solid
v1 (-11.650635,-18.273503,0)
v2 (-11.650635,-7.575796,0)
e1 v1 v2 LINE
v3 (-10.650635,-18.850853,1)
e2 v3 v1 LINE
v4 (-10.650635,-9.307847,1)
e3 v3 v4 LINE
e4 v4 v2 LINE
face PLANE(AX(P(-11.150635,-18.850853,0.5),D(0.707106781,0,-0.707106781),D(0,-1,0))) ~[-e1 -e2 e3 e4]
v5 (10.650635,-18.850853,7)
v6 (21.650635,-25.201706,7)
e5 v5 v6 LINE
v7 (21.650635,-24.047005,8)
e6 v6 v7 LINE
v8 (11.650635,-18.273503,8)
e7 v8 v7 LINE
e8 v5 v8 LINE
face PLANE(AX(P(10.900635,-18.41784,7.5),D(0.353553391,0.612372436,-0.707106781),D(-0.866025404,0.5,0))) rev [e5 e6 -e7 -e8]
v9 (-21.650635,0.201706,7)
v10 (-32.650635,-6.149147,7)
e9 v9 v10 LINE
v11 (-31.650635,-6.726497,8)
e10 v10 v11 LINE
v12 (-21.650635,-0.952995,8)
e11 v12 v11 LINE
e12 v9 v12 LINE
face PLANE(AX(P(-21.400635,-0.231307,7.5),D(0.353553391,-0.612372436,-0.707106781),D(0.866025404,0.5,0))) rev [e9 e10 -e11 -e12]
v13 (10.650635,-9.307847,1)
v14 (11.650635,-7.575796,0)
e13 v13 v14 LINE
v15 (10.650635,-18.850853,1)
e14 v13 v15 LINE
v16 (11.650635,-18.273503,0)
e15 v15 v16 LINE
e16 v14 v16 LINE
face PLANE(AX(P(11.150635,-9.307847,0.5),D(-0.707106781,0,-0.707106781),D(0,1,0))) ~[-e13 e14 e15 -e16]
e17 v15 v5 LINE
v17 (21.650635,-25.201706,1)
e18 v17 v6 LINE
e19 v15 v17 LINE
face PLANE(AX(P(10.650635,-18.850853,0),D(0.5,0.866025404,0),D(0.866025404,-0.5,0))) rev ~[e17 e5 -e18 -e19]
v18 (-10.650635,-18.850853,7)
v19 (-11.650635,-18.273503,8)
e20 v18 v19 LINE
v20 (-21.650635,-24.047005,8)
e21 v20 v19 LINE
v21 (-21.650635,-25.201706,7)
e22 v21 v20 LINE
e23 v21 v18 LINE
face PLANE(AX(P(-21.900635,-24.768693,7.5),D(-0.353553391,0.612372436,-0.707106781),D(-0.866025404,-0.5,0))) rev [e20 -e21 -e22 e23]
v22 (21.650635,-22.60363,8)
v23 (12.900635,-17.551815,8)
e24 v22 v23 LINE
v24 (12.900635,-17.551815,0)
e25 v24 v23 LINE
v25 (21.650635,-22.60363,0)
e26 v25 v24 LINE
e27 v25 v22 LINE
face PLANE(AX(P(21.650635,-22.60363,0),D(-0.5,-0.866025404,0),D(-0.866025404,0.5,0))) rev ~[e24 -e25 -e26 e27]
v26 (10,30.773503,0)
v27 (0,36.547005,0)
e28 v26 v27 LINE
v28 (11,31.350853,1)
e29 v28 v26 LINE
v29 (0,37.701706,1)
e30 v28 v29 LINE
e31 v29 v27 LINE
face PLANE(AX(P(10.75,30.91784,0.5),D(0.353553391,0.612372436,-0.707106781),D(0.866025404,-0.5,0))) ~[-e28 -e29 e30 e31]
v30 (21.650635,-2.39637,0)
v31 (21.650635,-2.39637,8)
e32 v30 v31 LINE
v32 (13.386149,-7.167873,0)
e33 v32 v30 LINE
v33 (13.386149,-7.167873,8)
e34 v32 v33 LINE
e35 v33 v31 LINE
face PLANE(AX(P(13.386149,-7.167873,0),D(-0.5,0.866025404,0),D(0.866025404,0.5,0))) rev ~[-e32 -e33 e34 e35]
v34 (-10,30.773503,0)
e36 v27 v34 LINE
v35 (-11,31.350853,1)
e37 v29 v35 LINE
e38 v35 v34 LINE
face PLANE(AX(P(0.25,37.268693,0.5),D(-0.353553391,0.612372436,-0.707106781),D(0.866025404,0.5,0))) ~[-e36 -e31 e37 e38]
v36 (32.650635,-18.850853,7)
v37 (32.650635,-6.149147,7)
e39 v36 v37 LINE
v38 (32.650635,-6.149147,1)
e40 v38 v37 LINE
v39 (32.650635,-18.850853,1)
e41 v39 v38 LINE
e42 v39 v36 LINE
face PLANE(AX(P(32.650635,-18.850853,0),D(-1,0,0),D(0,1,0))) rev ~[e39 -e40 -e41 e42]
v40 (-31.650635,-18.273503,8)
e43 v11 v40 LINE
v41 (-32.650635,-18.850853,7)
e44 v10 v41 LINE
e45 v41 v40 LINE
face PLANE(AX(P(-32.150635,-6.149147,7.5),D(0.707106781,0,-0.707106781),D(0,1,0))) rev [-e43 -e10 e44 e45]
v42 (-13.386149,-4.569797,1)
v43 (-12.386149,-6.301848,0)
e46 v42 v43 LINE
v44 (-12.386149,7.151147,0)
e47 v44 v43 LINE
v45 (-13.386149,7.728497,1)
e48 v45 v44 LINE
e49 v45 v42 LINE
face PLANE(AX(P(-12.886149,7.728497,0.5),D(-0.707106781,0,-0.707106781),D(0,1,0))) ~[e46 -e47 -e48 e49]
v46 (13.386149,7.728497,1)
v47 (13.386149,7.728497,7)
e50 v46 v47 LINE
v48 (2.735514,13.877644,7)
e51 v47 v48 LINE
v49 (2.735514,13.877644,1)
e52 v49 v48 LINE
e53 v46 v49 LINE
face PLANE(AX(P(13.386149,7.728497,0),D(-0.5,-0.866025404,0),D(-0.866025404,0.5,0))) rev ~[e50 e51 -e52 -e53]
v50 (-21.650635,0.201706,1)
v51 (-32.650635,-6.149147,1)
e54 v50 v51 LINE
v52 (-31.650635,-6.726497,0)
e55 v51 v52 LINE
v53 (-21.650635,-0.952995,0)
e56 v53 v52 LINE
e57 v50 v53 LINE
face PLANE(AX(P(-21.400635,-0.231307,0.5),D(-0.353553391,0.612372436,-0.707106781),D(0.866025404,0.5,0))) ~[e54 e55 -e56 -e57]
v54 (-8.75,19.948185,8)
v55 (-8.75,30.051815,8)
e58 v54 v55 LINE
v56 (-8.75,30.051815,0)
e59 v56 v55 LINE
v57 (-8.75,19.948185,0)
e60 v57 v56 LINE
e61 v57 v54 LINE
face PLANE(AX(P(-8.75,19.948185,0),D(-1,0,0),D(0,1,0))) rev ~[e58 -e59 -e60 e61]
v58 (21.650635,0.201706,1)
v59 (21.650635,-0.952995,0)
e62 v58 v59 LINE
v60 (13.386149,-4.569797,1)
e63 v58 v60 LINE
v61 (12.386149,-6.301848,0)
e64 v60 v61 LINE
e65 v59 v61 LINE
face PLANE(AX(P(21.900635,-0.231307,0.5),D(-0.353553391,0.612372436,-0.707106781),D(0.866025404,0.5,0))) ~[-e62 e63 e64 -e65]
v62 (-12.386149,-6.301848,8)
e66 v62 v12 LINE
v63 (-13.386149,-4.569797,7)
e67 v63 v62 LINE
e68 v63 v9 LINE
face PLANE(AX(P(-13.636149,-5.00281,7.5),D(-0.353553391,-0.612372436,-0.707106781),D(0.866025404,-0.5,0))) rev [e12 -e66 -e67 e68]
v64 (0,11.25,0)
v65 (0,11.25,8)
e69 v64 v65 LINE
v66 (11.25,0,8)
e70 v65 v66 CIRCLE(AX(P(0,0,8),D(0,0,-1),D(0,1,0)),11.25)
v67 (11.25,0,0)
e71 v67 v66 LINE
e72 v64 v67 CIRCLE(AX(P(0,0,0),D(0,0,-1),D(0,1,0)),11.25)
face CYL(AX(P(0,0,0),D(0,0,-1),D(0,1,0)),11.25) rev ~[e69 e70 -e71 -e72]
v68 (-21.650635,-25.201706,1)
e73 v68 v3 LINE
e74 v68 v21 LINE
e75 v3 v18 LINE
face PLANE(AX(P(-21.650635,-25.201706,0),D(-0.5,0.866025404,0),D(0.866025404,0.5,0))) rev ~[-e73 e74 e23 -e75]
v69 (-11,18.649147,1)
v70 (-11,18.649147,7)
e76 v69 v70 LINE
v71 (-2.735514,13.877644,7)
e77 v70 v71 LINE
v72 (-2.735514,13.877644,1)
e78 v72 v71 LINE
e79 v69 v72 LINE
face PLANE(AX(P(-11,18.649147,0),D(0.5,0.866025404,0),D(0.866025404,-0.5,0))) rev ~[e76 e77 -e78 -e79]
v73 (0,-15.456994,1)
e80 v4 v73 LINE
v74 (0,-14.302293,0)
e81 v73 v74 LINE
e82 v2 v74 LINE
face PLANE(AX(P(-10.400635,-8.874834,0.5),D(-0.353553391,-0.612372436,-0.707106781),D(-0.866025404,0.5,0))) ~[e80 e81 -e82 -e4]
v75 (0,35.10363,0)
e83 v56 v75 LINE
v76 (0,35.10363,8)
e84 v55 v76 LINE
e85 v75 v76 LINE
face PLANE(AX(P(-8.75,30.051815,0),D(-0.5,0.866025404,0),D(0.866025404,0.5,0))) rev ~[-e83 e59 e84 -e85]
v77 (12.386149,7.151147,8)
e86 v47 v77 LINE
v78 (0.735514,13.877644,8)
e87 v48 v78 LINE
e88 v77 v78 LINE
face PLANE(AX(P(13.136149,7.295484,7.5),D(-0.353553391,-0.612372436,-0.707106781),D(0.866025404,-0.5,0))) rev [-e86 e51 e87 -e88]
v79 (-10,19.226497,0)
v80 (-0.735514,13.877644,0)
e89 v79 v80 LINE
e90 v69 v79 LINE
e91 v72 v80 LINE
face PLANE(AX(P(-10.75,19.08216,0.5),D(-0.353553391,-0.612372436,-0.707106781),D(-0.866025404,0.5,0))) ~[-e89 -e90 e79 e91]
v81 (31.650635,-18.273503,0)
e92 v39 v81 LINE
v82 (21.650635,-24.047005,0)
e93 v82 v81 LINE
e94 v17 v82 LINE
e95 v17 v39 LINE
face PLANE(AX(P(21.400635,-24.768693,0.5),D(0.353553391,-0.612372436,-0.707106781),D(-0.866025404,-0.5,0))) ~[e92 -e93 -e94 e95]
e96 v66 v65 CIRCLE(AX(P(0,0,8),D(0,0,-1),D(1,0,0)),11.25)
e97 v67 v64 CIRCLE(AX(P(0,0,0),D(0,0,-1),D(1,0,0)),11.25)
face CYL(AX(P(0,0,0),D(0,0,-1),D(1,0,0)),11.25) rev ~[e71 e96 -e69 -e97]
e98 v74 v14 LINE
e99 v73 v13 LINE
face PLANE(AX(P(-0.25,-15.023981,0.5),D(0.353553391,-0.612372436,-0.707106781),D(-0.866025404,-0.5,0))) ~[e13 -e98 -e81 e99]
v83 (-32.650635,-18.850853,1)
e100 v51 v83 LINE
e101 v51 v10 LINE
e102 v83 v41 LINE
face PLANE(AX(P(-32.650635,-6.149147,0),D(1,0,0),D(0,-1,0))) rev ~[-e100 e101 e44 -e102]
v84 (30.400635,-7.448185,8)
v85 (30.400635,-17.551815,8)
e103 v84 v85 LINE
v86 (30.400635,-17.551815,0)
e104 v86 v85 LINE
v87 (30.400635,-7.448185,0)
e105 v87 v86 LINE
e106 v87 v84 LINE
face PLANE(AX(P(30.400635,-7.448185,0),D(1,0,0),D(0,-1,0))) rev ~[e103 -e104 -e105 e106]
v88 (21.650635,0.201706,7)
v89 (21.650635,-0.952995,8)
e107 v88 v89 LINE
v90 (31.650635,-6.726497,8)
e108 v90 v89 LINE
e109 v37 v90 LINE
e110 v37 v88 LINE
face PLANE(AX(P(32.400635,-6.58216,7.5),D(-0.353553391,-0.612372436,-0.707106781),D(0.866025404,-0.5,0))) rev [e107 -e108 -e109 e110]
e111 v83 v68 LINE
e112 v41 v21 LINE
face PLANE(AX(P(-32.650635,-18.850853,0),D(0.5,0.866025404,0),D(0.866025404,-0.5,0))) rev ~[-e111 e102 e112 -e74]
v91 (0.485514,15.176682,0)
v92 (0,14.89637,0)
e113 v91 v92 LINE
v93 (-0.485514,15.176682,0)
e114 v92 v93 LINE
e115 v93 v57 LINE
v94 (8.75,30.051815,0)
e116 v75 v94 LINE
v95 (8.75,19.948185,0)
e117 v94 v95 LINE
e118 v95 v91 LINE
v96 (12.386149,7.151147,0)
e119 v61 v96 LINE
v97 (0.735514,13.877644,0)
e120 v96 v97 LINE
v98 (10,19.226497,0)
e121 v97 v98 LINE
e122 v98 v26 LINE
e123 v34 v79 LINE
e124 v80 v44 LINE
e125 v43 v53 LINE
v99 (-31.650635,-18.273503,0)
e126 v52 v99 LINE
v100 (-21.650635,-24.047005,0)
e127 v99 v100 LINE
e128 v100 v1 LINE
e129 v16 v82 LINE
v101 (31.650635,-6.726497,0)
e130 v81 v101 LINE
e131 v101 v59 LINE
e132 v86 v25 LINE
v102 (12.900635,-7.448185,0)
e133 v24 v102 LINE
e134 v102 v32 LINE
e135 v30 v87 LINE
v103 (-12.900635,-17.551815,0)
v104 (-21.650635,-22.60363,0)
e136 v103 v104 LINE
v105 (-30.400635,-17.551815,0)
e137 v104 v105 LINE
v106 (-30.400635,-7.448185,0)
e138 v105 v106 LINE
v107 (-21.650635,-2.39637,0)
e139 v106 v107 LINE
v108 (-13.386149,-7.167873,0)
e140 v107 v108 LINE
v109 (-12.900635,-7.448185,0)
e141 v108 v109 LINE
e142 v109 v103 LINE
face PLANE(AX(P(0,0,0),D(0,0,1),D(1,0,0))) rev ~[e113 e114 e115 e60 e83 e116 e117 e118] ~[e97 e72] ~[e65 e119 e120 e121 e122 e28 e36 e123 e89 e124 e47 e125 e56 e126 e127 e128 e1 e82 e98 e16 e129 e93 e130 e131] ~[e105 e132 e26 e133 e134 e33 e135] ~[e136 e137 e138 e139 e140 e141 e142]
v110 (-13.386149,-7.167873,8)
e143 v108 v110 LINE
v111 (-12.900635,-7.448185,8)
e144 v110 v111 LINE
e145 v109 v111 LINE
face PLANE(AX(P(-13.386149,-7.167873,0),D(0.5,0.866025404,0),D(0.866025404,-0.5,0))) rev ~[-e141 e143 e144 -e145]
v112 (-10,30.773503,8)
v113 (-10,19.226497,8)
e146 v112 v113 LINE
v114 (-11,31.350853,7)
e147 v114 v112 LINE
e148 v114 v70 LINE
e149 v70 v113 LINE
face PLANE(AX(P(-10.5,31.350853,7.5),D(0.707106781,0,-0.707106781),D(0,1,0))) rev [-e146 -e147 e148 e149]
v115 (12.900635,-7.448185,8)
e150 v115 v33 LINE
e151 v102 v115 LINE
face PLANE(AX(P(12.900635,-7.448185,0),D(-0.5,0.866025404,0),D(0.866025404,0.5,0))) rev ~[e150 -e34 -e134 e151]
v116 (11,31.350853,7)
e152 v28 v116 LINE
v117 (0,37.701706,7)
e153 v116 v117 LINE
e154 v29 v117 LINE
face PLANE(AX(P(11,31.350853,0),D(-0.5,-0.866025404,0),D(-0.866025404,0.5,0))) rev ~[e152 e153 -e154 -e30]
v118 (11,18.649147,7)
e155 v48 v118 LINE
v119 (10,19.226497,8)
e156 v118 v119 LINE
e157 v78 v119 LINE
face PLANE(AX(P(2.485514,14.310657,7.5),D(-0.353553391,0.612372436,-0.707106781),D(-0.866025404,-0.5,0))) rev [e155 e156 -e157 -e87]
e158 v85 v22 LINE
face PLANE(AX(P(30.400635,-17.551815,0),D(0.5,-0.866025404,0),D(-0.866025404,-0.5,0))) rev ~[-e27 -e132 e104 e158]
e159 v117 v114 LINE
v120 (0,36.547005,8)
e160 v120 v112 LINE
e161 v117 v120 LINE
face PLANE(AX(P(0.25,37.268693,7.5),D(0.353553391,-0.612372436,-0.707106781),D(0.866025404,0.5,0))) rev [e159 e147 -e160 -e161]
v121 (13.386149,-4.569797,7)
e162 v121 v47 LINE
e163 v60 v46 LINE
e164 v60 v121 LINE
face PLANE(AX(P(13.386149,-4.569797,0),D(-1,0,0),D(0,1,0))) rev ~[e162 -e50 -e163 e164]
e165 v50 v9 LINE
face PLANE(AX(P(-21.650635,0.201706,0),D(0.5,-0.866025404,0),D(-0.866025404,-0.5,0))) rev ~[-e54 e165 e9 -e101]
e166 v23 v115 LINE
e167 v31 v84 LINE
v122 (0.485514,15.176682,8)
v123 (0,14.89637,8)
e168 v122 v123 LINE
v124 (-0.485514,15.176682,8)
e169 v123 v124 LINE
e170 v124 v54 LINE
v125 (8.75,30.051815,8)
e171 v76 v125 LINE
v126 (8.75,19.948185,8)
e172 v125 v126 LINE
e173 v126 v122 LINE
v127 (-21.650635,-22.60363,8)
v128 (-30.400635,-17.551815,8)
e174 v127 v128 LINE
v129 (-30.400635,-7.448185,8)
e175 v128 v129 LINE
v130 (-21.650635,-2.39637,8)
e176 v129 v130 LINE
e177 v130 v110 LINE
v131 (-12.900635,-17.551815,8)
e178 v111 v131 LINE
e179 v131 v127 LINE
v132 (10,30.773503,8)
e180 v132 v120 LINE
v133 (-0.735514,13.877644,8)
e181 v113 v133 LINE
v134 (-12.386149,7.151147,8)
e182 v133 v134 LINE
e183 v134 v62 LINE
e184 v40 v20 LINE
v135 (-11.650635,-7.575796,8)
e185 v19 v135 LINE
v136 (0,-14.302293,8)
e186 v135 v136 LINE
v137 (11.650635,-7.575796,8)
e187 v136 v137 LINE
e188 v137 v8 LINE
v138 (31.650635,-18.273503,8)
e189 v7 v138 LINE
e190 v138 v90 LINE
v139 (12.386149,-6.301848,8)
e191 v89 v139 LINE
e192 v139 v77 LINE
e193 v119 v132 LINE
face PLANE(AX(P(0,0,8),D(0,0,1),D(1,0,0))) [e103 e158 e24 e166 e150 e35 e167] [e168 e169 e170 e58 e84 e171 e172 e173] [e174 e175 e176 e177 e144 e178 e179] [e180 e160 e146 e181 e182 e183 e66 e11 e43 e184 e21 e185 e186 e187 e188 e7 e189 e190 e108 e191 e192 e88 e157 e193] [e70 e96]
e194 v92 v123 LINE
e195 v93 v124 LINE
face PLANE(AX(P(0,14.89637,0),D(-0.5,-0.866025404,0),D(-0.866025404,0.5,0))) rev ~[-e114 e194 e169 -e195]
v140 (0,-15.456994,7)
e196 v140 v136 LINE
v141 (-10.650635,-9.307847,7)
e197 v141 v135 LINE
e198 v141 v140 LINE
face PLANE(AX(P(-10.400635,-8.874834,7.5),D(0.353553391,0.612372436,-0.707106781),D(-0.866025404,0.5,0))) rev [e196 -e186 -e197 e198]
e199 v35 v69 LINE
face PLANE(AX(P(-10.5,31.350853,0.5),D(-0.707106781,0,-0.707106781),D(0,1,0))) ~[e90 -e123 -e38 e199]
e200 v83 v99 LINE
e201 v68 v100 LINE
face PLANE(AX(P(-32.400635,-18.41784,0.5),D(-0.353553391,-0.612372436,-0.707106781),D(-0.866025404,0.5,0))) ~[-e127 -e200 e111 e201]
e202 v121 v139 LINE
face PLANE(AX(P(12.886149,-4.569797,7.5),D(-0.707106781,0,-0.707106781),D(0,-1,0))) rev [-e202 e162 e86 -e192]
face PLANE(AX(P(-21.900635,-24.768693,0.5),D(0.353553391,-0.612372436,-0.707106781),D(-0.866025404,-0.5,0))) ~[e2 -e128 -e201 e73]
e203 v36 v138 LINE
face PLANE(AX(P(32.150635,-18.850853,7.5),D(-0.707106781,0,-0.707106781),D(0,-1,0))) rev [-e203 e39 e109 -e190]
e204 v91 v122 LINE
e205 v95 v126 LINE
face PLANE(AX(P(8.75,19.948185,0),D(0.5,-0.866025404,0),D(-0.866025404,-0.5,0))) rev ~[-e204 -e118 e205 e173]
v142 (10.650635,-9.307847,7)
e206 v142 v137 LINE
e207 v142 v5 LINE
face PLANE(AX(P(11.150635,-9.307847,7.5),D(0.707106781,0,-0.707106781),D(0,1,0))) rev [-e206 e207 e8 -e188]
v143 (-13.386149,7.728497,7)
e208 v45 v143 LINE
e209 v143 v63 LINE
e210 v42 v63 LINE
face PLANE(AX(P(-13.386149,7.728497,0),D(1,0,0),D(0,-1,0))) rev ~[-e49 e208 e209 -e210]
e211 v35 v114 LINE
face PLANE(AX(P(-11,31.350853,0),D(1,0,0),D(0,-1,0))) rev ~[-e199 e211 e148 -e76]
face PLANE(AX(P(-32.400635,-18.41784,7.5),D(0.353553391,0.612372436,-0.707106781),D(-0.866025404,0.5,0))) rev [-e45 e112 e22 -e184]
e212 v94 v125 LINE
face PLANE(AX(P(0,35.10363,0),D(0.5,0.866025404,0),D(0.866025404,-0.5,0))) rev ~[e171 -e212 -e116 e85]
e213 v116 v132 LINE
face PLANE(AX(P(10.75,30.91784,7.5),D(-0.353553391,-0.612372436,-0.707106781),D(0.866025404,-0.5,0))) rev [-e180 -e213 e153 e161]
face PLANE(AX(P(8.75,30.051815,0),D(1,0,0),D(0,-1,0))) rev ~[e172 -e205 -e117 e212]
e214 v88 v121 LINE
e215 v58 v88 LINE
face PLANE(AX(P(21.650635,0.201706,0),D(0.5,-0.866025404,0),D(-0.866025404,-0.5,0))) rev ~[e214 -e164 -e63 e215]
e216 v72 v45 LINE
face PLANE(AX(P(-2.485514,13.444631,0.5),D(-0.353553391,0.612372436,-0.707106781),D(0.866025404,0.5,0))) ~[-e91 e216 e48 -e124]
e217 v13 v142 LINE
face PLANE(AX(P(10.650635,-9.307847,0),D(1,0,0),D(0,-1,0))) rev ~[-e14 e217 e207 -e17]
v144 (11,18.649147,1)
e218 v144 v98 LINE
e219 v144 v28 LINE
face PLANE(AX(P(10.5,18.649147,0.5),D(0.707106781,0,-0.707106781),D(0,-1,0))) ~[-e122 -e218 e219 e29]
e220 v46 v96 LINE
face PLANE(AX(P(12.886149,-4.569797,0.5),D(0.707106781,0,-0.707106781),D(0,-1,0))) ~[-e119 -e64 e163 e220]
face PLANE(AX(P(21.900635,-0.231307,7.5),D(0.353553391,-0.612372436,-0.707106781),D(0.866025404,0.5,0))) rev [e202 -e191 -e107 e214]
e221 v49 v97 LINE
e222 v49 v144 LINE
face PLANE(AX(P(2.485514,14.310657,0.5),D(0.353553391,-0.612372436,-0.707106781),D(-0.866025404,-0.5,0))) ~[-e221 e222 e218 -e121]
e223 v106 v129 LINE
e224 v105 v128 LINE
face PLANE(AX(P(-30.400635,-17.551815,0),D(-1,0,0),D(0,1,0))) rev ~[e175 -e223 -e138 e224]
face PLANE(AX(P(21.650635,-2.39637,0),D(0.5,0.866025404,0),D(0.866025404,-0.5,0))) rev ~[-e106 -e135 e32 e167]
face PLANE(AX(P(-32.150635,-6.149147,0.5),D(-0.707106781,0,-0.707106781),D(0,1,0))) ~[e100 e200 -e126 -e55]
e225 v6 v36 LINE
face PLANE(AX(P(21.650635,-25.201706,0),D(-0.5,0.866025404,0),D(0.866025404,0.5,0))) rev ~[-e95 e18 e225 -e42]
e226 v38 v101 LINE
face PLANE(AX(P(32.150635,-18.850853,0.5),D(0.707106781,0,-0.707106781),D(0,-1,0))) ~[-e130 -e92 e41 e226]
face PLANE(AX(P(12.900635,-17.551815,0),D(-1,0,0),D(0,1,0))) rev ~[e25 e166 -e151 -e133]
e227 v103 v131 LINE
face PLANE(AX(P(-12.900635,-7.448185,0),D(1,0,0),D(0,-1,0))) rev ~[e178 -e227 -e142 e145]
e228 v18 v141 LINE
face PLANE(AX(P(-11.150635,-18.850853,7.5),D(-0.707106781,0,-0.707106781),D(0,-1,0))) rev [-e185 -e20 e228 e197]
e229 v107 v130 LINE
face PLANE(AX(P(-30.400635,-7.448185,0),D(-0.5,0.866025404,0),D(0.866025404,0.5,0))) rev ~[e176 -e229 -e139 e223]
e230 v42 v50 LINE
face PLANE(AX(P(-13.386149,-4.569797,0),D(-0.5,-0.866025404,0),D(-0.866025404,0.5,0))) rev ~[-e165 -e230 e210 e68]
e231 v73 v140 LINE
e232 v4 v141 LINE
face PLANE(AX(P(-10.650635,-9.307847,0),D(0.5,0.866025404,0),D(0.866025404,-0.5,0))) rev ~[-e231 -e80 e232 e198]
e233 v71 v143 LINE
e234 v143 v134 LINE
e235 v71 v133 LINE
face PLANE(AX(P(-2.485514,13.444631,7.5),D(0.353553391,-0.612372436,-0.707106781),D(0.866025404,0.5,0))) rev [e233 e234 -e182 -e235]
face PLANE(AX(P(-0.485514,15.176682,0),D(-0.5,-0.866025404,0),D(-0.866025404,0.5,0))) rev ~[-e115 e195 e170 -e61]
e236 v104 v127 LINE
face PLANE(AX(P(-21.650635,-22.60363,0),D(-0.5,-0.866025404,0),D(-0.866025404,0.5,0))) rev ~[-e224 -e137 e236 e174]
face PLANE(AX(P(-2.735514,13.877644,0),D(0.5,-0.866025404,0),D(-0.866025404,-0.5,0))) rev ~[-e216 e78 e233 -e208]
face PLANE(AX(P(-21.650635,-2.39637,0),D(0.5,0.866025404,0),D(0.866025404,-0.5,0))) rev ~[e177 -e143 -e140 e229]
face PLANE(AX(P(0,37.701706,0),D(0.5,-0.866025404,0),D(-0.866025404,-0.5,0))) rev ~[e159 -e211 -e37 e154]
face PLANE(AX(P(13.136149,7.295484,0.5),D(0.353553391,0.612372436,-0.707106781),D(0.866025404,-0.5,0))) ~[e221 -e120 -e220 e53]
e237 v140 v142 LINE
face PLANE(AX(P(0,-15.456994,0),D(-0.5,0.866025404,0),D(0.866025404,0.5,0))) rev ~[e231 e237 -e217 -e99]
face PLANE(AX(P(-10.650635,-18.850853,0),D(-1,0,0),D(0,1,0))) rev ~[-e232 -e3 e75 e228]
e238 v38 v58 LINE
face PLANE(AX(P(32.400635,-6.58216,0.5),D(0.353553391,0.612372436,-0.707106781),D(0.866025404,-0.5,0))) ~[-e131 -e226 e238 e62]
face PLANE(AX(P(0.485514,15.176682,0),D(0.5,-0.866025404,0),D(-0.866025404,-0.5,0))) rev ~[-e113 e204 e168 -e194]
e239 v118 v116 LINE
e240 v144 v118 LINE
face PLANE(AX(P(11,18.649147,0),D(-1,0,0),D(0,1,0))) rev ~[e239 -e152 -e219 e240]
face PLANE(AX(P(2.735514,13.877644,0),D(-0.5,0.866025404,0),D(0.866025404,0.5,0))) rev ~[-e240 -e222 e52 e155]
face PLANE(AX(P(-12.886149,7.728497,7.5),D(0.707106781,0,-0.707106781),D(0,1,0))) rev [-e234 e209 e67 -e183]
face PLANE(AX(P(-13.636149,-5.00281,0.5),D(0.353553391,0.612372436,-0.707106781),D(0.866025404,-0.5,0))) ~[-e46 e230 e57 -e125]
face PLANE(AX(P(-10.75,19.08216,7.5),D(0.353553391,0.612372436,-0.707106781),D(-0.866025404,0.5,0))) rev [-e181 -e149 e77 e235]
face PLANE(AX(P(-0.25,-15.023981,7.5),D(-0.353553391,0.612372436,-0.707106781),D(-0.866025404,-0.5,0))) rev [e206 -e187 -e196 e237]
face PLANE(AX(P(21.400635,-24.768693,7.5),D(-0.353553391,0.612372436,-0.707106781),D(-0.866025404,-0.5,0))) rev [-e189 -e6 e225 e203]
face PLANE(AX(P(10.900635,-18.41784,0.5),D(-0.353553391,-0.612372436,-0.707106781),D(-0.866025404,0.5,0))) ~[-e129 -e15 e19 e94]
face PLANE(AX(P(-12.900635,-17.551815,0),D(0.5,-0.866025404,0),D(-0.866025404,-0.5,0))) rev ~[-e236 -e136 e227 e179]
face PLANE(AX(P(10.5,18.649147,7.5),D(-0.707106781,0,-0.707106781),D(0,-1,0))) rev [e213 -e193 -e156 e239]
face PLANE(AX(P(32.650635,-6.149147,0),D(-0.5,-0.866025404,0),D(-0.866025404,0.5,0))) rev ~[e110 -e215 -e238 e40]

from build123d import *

# Parameters (mm, degrees)
F1_DEPTH = 8
F2_SIZE  = 1


# Not quite as in the source:
# - a feature names something its author has since deleted; it is built from what else it names


with BuildPart() as f1:
    # F0 (on Top) → F1 (new body)
    with BuildSketch(Plane.XY):
        Polygon((2.7355143452, 13.8776440214), (0, 12.2982940778), (-2.7355143452, 13.8776440214), (-13.3861494398, 7.7284969825), (-13.3861494398, -4.5697970953), (-10.6506350946, -6.1491470389), (-10.6506350946, -9.3078469261), (0, -15.456993965), (10.6506350946, -9.3078469261), (10.6506350946, -6.1491470389), (13.3861494398, -4.5697970953), (13.3861494398, 7.7284969825), align=None)
        with BuildLine():
            ThreePointArc((0, 11.25), (7.9549512883, 7.9549512883), (11.25, 0))
            ThreePointArc((11.25, 0), (-7.9549512883, -7.9549512883), (0, 11.25))
        make_face(mode=Mode.SUBTRACT)
        Polygon((-2.7355143452, 13.8776440214), (0, 12.2982940778), (0, 14.8963702892), (-0.4855143452, 15.1766821271), align=None)
        Polygon((0, 14.8963702892), (0, 12.2982940778), (2.7355143452, 13.8776440214), (0.4855143452, 15.1766821271), align=None)
        Polygon((-11, 18.6491470389), (-2.7355143452, 13.8776440214), (-0.4855143452, 15.1766821271), (-8.75, 19.9481851446), (-8.75, 30.0518148554), (0, 35.1036297108), (8.75, 30.0518148554), (8.75, 19.9481851446), (0.4855143452, 15.1766821271), (2.7355143452, 13.8776440214), (11, 18.6491470389), (11, 31.3508529611), (0, 37.7017059222), (-11, 31.3508529611), align=None)
        Polygon((-13.3861494398, -7.1678733067), (-13.3861494398, -4.5697970953), (-21.6506350946, 0.2017059222), (-32.6506350946, -6.1491470389), (-32.6506350946, -18.8508529611), (-21.6506350946, -25.2017059222), (-10.6506350946, -18.8508529611), (-10.6506350946, -9.3078469261), (-12.9006350946, -8.0088088204), (-12.9006350946, -17.5518148554), (-21.6506350946, -22.6036297108), (-30.4006350946, -17.5518148554), (-30.4006350946, -7.4481851446), (-21.6506350946, -2.3963702892), align=None)
        Polygon((-10.6506350946, -6.1491470389), (-13.3861494398, -4.5697970953), (-13.3861494398, -7.1678733067), (-12.9006350946, -7.4481851446), (-12.9006350946, -8.0088088204), (-10.6506350946, -9.3078469261), align=None)
        Polygon((13.3861494398, -7.1678733067), (13.3861494398, -4.5697970953), (10.6506350946, -6.1491470389), (10.6506350946, -9.3078469261), (12.9006350946, -8.0088088204), (12.9006350946, -7.4481851446), align=None)
        Polygon((21.6506350946, 0.2017059222), (13.3861494398, -4.5697970953), (13.3861494398, -7.1678733067), (21.6506350946, -2.3963702892), (30.4006350946, -7.4481851446), (30.4006350946, -17.5518148554), (21.6506350946, -22.6036297108), (12.9006350946, -17.5518148554), (12.9006350946, -8.0088088204), (10.6506350946, -9.3078469261), (10.6506350946, -18.8508529611), (21.6506350946, -25.2017059222), (32.6506350946, -18.8508529611), (32.6506350946, -6.1491470389), align=None)
    extrude(amount=F1_DEPTH)

    # F2
    f2_edges = [f1.edges().sort_by_distance(p)[0] for p in [
        (-8.060832, 10.803071, 8),
        (-13.386149, 1.57935, 8),
        (-17.518392, -2.184046, 8),
        (-27.150635, -2.973721, 8),
        (-32.650635, -12.5, 8),
        (-27.150635, -22.026279, 8),
        (-16.150635, -22.026279, 8),
        (-5.325318, -12.38242, 8),
        (-10.650635, -14.07935, 8),
        (5.325318, -12.38242, 8),
        (10.650635, -14.07935, 8),
        (16.150635, -22.026279, 8),
        (27.150635, -22.026279, 8),
        (32.650635, -12.5, 8),
        (27.150635, -2.973721, 8),
        (17.518392, -2.184046, 8),
        (13.386149, 1.57935, 8),
        (8.060832, 10.803071, 8),
        (6.867757, 16.263396, 8),
        (11, 25, 8),
        (5.5, 34.526279, 8),
        (-5.5, 34.526279, 8),
        (-11, 25, 8),
        (-6.867757, 16.263396, 8),
        (-11, 25, 0),
        (-5.5, 34.526279, 0),
        (5.5, 34.526279, 0),
        (11, 25, 0),
        (6.867757, 16.263396, 0),
        (-6.867757, 16.263396, 0),
        (-8.060832, 10.803071, 0),
        (8.060832, 10.803071, 0),
        (13.386149, 1.57935, 0),
        (-13.386149, 1.57935, 0),
        (17.518392, -2.184046, 0),
        (27.150635, -2.973721, 0),
        (32.650635, -12.5, 0),
        (27.150635, -22.026279, 0),
        (16.150635, -22.026279, 0),
        (10.650635, -14.07935, 0),
        (5.325318, -12.38242, 0),
        (-5.325318, -12.38242, 0),
        (-10.650635, -14.07935, 0),
        (-16.150635, -22.026279, 0),
        (-27.150635, -22.026279, 0),
        (-32.650635, -12.5, 0),
        (-27.150635, -2.973721, 0),
        (-17.518392, -2.184046, 0),
    ]]
    chamfer(f2_edges, length=F2_SIZE)


solid = f1.part
